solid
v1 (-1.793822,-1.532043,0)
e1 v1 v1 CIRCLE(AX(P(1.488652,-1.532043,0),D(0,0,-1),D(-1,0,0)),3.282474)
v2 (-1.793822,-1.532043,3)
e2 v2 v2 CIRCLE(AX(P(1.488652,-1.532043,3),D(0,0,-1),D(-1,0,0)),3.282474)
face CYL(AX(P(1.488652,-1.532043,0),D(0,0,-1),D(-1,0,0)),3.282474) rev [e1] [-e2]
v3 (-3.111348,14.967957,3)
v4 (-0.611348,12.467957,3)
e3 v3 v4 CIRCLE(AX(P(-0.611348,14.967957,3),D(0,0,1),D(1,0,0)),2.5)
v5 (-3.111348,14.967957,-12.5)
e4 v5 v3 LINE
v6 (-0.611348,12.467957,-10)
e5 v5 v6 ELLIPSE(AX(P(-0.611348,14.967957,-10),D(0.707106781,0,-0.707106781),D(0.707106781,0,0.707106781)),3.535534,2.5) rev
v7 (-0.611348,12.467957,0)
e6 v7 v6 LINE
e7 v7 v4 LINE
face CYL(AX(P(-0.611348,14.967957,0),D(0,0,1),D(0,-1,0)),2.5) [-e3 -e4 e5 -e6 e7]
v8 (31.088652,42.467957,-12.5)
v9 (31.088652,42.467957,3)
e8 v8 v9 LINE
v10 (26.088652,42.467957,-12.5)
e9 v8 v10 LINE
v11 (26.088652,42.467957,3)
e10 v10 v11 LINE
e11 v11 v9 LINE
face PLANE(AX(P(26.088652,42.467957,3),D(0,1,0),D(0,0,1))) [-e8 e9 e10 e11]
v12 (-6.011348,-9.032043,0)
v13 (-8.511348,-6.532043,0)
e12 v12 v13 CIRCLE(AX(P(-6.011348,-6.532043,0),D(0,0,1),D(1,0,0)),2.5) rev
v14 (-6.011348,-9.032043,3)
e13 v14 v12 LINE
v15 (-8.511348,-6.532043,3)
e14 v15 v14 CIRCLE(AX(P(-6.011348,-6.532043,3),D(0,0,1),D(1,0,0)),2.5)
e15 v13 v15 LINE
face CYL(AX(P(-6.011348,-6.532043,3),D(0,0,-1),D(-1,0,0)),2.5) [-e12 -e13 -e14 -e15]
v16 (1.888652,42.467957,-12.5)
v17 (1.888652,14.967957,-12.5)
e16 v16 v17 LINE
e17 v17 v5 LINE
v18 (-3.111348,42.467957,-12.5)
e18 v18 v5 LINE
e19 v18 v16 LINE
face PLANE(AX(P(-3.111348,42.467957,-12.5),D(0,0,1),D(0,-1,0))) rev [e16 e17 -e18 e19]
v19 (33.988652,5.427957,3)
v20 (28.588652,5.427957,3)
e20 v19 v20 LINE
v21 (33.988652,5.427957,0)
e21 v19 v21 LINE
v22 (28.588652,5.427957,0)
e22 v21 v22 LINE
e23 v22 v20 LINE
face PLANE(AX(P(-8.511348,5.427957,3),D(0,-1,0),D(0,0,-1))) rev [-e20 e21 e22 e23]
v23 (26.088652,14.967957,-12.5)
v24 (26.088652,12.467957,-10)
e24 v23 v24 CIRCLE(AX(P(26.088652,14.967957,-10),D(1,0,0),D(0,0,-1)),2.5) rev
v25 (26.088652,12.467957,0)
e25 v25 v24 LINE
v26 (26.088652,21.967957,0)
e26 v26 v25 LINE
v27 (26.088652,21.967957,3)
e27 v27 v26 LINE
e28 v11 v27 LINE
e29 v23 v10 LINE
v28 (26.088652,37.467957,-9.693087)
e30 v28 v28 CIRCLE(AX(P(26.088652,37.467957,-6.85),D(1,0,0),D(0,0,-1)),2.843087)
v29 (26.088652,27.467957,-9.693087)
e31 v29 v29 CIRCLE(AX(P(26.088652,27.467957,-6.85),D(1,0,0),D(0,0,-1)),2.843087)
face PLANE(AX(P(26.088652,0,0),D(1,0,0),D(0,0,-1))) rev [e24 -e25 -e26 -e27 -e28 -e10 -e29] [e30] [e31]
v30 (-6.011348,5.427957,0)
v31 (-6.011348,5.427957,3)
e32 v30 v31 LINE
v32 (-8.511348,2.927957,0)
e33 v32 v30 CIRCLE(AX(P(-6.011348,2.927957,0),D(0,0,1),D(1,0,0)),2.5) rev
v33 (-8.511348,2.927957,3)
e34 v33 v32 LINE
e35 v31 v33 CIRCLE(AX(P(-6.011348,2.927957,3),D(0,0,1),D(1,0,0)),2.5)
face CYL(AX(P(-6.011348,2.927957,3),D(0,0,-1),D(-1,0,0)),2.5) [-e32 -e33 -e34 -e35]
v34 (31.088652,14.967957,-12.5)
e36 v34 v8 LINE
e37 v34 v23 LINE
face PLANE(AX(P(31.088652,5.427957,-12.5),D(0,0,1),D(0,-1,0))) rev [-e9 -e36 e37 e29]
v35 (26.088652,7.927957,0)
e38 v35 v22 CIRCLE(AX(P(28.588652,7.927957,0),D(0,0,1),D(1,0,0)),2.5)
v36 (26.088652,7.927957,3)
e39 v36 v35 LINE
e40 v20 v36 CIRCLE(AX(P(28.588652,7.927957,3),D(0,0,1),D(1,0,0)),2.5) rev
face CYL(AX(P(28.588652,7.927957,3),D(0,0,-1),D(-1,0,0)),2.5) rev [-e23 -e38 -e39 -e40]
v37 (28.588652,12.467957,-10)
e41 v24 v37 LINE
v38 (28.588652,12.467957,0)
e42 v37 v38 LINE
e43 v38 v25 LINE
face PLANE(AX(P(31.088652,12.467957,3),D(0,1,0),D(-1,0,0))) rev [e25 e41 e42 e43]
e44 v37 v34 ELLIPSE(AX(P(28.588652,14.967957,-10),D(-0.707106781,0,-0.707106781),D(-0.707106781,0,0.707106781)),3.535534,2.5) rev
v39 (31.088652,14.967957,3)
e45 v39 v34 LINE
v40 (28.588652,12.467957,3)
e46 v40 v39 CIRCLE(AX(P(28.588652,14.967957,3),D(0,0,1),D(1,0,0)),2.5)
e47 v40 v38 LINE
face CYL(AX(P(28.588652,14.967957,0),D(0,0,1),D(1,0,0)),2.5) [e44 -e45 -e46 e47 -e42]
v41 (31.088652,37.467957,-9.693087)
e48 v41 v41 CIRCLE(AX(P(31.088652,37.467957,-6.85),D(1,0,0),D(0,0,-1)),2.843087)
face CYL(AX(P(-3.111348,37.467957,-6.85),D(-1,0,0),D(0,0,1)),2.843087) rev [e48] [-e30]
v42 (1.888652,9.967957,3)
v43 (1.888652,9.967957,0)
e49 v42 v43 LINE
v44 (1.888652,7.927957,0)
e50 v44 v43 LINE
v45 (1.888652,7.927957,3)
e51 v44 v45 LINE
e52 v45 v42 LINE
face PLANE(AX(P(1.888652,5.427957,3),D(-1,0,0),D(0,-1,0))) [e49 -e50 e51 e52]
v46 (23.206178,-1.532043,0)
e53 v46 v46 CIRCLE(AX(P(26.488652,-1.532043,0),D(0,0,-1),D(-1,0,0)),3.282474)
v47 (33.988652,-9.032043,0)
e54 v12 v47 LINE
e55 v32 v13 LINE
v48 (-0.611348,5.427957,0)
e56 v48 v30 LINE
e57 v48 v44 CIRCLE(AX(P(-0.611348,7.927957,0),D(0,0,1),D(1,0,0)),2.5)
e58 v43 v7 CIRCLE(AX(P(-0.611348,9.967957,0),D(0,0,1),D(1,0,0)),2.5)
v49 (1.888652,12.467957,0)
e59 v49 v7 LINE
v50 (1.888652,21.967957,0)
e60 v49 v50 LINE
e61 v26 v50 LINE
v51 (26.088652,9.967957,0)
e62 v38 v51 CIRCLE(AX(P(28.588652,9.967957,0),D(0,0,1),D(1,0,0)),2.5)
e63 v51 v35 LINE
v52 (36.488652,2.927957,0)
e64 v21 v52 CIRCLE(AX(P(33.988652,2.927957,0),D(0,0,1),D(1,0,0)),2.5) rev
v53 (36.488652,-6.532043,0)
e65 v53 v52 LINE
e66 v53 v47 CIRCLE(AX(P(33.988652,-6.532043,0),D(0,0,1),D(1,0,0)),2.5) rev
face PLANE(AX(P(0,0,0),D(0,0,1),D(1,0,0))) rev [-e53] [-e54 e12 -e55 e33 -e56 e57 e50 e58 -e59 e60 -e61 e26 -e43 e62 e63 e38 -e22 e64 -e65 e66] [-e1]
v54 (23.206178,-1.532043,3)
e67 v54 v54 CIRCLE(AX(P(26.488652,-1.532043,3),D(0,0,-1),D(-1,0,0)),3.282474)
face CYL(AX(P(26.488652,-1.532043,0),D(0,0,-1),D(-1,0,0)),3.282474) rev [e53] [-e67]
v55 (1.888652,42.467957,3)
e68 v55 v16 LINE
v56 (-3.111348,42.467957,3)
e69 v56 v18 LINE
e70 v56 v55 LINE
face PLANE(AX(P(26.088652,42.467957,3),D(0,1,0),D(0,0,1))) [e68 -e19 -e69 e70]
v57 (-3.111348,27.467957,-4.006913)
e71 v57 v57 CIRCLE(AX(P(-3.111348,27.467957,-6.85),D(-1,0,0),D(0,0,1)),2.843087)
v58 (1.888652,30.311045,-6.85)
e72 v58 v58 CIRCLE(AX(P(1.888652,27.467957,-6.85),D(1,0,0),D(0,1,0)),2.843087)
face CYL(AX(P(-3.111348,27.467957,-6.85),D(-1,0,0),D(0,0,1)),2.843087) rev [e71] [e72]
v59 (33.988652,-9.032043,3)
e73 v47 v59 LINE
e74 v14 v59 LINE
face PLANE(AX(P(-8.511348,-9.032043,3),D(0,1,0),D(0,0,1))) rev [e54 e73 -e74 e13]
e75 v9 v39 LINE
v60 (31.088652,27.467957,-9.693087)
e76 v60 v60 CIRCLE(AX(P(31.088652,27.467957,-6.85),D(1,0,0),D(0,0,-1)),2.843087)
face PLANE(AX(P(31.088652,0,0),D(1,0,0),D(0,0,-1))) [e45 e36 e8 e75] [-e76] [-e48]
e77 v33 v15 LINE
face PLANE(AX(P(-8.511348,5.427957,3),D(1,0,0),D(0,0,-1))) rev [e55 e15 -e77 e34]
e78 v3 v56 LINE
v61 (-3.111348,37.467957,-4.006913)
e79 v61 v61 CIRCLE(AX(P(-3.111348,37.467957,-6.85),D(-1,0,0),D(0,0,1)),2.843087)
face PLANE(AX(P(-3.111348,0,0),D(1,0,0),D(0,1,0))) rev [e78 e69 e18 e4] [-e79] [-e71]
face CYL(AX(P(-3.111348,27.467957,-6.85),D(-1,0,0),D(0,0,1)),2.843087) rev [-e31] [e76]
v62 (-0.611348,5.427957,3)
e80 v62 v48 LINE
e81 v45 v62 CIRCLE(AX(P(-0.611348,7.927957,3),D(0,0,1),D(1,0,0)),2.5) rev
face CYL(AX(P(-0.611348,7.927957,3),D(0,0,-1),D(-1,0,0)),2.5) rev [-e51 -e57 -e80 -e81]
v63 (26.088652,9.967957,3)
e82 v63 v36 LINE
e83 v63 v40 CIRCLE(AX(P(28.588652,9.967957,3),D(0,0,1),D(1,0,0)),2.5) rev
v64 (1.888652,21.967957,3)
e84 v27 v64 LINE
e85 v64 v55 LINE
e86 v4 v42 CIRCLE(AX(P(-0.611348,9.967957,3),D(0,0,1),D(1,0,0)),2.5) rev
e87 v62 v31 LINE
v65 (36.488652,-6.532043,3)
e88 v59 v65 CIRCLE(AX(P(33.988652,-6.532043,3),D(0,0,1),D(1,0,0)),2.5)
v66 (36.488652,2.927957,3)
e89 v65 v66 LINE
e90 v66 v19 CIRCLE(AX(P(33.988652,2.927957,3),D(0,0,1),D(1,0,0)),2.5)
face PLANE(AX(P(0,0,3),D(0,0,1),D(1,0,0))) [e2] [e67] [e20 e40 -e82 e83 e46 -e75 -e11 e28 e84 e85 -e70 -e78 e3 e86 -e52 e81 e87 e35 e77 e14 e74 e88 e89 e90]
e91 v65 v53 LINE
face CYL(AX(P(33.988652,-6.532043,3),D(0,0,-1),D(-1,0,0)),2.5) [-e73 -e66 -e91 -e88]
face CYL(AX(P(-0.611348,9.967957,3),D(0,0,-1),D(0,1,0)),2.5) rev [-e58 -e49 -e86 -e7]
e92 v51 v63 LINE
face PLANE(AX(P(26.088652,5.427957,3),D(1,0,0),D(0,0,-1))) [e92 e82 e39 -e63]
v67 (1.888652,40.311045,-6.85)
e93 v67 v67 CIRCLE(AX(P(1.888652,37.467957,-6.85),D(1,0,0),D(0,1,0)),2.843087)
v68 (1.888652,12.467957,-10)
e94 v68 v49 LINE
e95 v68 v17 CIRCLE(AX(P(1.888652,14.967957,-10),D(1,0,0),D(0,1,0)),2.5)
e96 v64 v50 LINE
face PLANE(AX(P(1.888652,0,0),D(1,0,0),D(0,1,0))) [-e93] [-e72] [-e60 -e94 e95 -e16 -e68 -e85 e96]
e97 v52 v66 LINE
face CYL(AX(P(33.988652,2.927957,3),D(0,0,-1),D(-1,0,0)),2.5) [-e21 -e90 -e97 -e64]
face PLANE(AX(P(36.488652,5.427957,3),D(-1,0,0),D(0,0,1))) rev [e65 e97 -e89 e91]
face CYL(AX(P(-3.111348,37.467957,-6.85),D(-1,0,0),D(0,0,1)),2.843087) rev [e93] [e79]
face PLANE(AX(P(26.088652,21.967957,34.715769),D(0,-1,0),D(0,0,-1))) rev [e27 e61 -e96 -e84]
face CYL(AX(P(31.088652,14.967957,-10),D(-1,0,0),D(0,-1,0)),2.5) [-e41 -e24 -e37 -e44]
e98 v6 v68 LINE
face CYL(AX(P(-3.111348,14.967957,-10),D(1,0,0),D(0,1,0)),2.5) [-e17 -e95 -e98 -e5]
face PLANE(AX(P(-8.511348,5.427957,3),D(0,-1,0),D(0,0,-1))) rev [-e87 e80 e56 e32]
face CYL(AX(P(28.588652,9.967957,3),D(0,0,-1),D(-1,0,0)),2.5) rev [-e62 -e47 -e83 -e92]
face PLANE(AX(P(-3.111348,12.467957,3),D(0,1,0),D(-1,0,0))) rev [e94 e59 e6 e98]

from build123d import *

# Parameters (mm, degrees)
SKETCH1_W                        = 45
SKETCH1_H                        = 14.46
BOSS_EXTRUDE1_DEPTH              = 3
F_1_4_0_2584625_DIAMETER_HOLE1_D = 6.5649475
SKETCH5_W                        = 24.2
SKETCH5_H                        = 37.04
BOSS_EXTRUDE2_DEPTH              = 3
SKETCH6_W                        = 15.5
SKETCH6_H                        = 30
BOSS_EXTRUDE3_DEPTH              = 5
BOSS_EXTRUDE4_START              = -29.2
SKETCH7_W                        = 15.5
SKETCH7_H                        = 30
BOSS_EXTRUDE4_DEPTH              = 5
SKETCH12_W                       = 24.2
SKETCH12_H                       = 20.5
CUT_EXTRUDE1_DEPTH               = 3
M5_CLEARANCE_HOLE1_D             = 5.686175
FILLET3_R                        = 2.5
FILLET4_R                        = 2.5


with BuildPart() as part:
    # Sketch1 → Boss-Extrude1 (new body)
    with BuildSketch(Plane.XY):
        with Locations((13.988651535, -1.802042724)):
            Rectangle(SKETCH1_W, SKETCH1_H)
    extrude(amount=BOSS_EXTRUDE1_DEPTH)

    # 1/4 (0.2584625) Diameter Hole1 (through all)
    with Locations(Plane(origin=(0, 0, 0), x_dir=(-1, 0, 0), z_dir=(0, 0, -1))):
        with Locations((-26.488651535, -1.532042724), (-1.488651535, -1.532042724)):
            Hole(F_1_4_0_2584625_DIAMETER_HOLE1_D / 2)

    # Sketch5 → Boss-Extrude2 (add)
    with BuildSketch(Plane(origin=(0, 0, 0), x_dir=(-1, 0, 0), z_dir=(0, 0, -1))):
        with Locations((-13.988651535, 23.947957276)):
            Rectangle(SKETCH5_W, SKETCH5_H)
    extrude(amount=-BOSS_EXTRUDE2_DEPTH)

    # Sketch6 → Boss-Extrude3 (add)
    with BuildSketch(Plane.ZY.offset(-1.888651535)):
        with Locations((-4.75, 27.467957276)):
            Rectangle(SKETCH6_W, SKETCH6_H)
    extrude(amount=BOSS_EXTRUDE3_DEPTH)

    # Sketch7 → Boss-Extrude4 (add)
    with BuildSketch(Plane.ZY.offset(3.111348465).offset(BOSS_EXTRUDE4_START)):
        with Locations((-4.75, 27.467957276)):
            Rectangle(SKETCH7_W, SKETCH7_H)
    extrude(amount=-BOSS_EXTRUDE4_DEPTH)

    # Sketch12 → Cut-Extrude1 (cut)
    with BuildSketch(Plane(origin=(0, 0, 0), x_dir=(-1, 0, 0), z_dir=(0, 0, -1))):
        with Locations((-13.988651535, 32.217957276)):
            Rectangle(SKETCH12_W, SKETCH12_H)
    extrude(amount=-CUT_EXTRUDE1_DEPTH, mode=Mode.SUBTRACT)

    # M5 Clearance Hole1 (through all)
    with Locations(Plane.ZY.offset(3.111348465)):
        with Locations((-6.85, 37.467957276), (-6.85, 27.467957276)):
            Hole(M5_CLEARANCE_HOLE1_D / 2)

    # Fillet3
    fillet3_edges = [part.edges().sort_by_distance(p)[0] for p in [
        (-8.511348465, 5.427957276, 1.5),
        (36.488651535, 5.427957276, 1.5),
        (36.488651535, -9.032042724, 1.5),
        (-8.511348465, -9.032042724, 1.5),
    ]]
    fillet(fillet3_edges, radius=FILLET3_R)

    # Fillet4
    fillet4_edges = [part.edges().sort_by_distance(p)[0] for p in [
        (1.888651535, 5.427957276, 1.5),
        (26.088651535, 5.427957276, 1.5),
        (26.088651535, 12.467957276, 1.5),
        (1.888651535, 12.467957276, 1.5),
        (31.088651535, 12.467957276, -4.75),
        (-3.111348465, 12.467957276, -4.75),
        (28.588651535, 12.467957276, -12.5),
        (-0.611348465, 12.467957276, -12.5),
    ]]
    fillet(fillet4_edges, radius=FILLET4_R - 0.0001)  # a hair under: the kernel refuses the full size


solid = part.part
